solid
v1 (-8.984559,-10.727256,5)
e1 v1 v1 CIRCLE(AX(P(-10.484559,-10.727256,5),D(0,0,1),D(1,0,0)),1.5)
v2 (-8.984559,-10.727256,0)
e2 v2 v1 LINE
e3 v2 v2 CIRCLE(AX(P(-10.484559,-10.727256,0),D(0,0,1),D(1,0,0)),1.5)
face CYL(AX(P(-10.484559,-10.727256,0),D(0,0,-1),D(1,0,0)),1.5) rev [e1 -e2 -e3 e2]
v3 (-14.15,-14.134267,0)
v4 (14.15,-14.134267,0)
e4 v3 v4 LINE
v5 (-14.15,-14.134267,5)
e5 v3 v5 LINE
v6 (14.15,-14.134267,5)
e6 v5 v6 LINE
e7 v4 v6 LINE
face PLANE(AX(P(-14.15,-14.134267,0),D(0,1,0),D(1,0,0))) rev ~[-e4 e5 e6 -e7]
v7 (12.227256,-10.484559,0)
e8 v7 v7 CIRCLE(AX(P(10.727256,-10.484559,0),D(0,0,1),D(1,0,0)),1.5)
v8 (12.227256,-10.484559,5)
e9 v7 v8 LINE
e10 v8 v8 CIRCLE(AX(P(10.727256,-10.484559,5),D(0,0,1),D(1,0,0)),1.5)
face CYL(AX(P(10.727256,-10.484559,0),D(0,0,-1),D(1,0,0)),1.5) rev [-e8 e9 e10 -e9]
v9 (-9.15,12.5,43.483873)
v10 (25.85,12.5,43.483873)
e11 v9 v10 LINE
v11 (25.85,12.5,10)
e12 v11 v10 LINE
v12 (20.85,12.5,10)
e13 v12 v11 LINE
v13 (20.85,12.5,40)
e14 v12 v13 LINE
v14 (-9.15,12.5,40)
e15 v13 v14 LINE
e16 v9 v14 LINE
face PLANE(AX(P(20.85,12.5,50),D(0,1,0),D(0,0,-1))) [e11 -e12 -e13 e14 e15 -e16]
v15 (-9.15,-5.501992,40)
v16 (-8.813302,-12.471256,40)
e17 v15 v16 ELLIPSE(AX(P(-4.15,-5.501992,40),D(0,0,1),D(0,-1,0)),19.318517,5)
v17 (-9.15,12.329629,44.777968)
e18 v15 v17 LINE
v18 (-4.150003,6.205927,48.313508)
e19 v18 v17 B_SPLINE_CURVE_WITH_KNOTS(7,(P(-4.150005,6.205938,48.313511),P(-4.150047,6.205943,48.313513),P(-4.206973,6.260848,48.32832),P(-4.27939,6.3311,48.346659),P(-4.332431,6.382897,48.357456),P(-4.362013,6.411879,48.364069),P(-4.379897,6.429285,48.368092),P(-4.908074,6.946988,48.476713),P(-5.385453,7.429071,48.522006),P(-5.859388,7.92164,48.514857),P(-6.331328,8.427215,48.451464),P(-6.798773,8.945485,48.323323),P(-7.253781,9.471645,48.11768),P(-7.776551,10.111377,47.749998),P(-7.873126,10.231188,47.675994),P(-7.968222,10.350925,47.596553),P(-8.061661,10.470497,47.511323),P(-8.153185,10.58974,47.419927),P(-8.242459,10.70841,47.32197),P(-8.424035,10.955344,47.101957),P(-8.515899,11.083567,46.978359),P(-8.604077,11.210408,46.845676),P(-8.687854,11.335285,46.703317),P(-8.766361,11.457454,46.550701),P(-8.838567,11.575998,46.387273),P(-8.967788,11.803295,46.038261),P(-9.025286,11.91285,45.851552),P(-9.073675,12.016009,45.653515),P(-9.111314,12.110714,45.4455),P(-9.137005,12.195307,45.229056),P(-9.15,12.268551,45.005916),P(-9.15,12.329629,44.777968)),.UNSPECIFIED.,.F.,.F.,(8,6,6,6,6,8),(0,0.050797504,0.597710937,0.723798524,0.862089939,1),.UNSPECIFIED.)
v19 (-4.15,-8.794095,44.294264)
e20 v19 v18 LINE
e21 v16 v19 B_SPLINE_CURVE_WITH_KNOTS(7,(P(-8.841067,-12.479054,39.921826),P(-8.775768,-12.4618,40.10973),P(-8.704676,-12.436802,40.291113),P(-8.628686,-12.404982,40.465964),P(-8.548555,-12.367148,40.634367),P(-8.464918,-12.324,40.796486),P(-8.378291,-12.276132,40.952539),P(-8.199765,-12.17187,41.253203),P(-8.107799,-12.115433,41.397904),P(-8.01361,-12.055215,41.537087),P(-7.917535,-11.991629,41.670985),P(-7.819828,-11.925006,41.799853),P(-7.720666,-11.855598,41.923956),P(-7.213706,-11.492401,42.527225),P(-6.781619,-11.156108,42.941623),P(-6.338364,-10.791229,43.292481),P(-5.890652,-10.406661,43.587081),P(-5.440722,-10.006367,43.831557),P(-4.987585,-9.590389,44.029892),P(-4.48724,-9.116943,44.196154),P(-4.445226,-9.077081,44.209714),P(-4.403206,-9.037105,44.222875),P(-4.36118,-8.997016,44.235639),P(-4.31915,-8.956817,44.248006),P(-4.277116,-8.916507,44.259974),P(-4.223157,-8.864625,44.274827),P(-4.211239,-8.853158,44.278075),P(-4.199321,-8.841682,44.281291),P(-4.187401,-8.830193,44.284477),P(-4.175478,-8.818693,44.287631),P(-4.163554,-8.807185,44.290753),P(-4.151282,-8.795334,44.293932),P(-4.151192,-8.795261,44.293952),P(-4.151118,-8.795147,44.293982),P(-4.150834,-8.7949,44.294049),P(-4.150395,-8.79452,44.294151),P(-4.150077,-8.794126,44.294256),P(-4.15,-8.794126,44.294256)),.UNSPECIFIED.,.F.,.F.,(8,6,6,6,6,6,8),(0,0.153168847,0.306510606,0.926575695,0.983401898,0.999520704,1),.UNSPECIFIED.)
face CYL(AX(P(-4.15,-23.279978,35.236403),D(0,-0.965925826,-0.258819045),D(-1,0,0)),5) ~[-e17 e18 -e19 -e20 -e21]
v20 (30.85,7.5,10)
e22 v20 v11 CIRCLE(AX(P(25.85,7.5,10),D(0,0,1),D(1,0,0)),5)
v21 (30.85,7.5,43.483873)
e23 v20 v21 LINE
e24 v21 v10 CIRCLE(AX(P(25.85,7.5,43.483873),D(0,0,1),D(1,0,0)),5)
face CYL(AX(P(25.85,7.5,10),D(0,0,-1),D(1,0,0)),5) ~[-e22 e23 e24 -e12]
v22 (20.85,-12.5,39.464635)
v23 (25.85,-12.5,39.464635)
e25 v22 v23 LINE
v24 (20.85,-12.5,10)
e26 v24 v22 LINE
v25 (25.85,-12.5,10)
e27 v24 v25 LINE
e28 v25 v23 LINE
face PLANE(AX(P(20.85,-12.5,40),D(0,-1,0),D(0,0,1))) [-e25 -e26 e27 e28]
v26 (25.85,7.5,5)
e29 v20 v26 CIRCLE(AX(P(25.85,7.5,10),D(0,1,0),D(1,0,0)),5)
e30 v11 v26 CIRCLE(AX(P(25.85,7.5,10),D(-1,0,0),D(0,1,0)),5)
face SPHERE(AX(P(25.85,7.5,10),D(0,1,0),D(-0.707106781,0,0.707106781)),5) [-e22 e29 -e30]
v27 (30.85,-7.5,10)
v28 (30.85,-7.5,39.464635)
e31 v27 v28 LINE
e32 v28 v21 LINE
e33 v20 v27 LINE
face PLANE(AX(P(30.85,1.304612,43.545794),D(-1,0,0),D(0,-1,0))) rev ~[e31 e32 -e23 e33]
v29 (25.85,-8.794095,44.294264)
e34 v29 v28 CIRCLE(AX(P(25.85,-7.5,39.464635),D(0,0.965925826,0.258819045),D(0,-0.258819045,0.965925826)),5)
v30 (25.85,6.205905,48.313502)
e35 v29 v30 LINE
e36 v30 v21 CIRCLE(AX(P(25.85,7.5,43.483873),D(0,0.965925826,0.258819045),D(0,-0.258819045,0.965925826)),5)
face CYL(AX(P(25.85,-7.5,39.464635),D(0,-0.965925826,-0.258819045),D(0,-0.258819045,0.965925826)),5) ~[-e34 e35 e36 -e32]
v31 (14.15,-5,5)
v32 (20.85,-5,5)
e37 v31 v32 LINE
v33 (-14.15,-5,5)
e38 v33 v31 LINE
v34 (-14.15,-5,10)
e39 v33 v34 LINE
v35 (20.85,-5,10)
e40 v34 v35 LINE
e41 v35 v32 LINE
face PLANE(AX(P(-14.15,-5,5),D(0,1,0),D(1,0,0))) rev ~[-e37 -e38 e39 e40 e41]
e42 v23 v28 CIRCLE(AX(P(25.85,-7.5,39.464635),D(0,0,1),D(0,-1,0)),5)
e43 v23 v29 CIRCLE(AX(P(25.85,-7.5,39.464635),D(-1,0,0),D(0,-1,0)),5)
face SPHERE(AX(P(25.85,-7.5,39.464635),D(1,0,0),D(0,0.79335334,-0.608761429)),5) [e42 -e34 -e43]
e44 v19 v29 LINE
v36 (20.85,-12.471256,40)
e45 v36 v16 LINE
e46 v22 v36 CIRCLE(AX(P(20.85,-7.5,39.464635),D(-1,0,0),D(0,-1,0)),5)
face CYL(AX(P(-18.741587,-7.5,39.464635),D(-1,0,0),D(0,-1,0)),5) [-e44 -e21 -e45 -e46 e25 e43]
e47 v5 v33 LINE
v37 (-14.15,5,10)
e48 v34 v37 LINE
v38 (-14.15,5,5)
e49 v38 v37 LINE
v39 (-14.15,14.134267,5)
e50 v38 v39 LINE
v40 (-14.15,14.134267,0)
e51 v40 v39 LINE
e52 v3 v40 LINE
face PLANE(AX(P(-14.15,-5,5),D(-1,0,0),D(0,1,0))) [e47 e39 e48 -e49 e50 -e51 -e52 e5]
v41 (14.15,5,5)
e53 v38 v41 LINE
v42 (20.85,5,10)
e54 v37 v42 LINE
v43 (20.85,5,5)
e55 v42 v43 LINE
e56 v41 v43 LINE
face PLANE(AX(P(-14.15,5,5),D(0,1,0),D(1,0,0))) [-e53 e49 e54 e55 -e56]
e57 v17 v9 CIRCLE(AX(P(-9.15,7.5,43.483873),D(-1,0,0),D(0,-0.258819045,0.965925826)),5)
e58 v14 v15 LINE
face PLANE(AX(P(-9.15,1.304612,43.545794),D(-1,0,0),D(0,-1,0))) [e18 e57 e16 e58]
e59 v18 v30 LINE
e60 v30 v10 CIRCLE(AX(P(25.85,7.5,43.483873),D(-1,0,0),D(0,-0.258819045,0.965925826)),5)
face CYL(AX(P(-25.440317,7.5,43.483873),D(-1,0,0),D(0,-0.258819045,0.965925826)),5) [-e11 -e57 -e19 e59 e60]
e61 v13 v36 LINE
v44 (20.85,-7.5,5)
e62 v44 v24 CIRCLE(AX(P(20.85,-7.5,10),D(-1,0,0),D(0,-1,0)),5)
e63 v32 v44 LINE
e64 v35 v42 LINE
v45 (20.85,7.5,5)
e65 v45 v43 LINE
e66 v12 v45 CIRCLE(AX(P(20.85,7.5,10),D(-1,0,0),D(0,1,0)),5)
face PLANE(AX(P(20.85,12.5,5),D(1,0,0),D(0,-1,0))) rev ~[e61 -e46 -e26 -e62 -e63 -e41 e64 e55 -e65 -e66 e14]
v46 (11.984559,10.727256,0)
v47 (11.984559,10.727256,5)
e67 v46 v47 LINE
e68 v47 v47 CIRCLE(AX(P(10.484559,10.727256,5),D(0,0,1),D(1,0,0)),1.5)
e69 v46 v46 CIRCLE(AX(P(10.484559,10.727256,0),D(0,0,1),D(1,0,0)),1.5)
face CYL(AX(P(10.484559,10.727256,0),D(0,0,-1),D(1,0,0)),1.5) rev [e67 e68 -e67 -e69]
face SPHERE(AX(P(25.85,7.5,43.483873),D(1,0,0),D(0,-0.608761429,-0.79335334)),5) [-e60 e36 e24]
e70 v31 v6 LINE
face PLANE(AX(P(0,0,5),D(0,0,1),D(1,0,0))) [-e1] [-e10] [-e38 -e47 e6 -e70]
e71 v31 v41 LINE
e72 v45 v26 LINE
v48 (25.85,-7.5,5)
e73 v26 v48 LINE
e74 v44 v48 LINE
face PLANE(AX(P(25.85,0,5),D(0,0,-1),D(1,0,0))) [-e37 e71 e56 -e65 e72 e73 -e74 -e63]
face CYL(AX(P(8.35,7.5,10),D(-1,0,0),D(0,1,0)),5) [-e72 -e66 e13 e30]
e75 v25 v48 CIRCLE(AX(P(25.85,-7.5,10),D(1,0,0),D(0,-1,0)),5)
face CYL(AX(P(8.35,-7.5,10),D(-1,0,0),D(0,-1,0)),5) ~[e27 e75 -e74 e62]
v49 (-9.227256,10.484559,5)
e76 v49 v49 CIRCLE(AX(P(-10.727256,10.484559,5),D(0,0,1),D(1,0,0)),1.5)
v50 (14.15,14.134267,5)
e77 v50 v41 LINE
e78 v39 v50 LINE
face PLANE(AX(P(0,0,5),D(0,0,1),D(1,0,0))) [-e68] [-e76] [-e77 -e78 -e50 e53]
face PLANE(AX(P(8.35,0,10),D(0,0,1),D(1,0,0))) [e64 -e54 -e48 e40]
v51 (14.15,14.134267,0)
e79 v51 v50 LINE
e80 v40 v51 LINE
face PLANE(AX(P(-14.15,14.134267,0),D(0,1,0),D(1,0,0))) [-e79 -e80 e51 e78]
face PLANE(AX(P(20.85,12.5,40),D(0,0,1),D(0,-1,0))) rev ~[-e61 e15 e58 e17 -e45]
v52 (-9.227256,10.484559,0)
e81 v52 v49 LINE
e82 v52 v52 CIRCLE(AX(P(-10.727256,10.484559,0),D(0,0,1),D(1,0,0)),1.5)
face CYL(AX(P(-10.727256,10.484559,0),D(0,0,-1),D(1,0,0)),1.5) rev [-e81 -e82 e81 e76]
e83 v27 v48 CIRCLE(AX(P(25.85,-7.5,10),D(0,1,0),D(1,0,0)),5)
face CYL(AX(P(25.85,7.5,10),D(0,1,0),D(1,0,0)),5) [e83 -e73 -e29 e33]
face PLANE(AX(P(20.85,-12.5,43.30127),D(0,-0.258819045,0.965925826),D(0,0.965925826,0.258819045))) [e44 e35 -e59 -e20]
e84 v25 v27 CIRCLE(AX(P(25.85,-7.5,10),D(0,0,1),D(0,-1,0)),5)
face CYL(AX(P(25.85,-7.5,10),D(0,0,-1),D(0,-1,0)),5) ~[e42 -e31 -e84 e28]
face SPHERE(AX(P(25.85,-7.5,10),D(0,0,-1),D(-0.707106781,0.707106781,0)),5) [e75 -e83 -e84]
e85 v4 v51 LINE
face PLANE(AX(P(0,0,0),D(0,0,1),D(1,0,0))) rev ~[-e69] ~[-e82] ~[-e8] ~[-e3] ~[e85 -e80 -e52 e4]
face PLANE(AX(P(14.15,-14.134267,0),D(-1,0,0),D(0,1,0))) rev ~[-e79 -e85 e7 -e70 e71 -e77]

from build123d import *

# Parameters (mm, degrees)
F0_W          = 28.3
F0_H          = 28.2685337434
F0_R          = 1.5
F1_DEPTH      = 5
F2_W          = 45
F2_H          = 10
F3_DEPTH      = 5
F4_W          = 10
F4_H          = 25
F5_DEPTH      = 35
F7_DEPTH      = 30
F7_DEPTH_BACK = 10
F8_T1_DEPTH   = 51.2903171605
F8_T3_DEPTH   = 50.8819045103
F8_T5_DEPTH   = 44.5915873497
F8_T7_DEPTH   = 15.5291427062
F8_T9_DEPTH   = 33.4838731358
F8_T11_DEPTH  = 29.4646352493
F8_T13_DEPTH  = 15
F8_T15_DEPTH  = 17.5
F8_T20_DEPTH  = 5
F8_T26_DEPTH  = 5
F8_S31_W      = 5
F8_S31_H      = 5
F8_T32_DEPTH  = 5
F8_S37_W      = 5
F8_S37_H      = 5
F8_T38_DEPTH  = 5


# Not quite as in the source:
# - a fillet or chamfer that OpenCascade refuses, or shapes differently, is made with other operations: its cross-section is extruded or revolved along the edge and cut away or added


with BuildPart() as f1:
    # F0 (on Top) → F1 (new body)
    with BuildSketch(Plane.XY):
        Rectangle(F0_W, F0_H)
        with Locations((-10.4845586502, -10.7272564019)):
            Circle(F0_R, mode=Mode.SUBTRACT)
        with Locations((10.7272564019, -10.4845586502)):
            Circle(F0_R, mode=Mode.SUBTRACT)
        with Locations((-10.7272564019, 10.4845586502)):
            Circle(F0_R, mode=Mode.SUBTRACT)
        with Locations((10.4845586502, 10.7272564019)):
            Circle(F0_R, mode=Mode.SUBTRACT)
    extrude(amount=F1_DEPTH)

    # F2 (on face) → F3 (join)
    with BuildSketch(Plane.XY.offset(5)):
        with Locations((8.35, 0)):
            Rectangle(F2_W, F2_H)
    extrude(amount=F3_DEPTH)

    # F4 (on face) → F5 (join)
    with BuildSketch(Plane(origin=(0, 0, 5), x_dir=(1, 0, 0), z_dir=(0, 0, -1))):
        with Locations((25.85, 0)):
            Rectangle(F4_W, F4_H)
    extrude(amount=-F5_DEPTH)

    # F6 (on face) → F7 (join, two sides)
    with BuildSketch(Plane(origin=(20.85, 0, 0), x_dir=(0, -1, 0), z_dir=(-1, 0, 0))) as f7_sk:
        Polygon((-12.5, 50), (-12.5, 40), (12.5, 40), (12.5, 43.3012701892), align=None)
    extrude(amount=F7_DEPTH)
    extrude(f7_sk.sketch, amount=-F7_DEPTH_BACK)

    # F8: fillet of radius 5 on 9 edges, made by hand

    # F8_s2 → F8_t1 (cut)
    with BuildSketch(Plane.YZ.offset(-25.4403171605)):
        with BuildLine():
            ThreePointArc((6.2059047745, 48.3135022672), (10.543807145, 47.4506398373), (12.5, 43.4838731358))
            Line((12.5, 43.4838731358), (12.5, 50))
            Line((12.5, 50), (6.2059047745, 48.3135022672))
        make_face()
    extrude(amount=F8_T1_DEPTH, mode=Mode.SUBTRACT)

    # F8_s4 → F8_t3 (cut)
    with BuildSketch(Plane(origin=(0, -12.911414055, -3.4596029692), x_dir=(1, 0, 0), z_dir=(0, 0.9659258263, 0.2588190451))):
        with BuildLine():
            ThreePointArc((-9.15, -40.0610532507), (-7.6855339059, -43.5965871566), (-4.15, -45.0610532507))
            Line((-4.15, -45.0610532507), (-9.15, -45.0610532507))
            Line((-9.15, -45.0610532507), (-9.15, -40.0610532507))
        make_face()
    extrude(amount=F8_T3_DEPTH, mode=Mode.SUBTRACT)

    # F8_s6 → F8_t5 (cut)
    with BuildSketch(Plane.YZ.offset(-18.7415873497)):
        with BuildLine():
            ThreePointArc((-12.5, 39.4646352493), (-11.4667667015, 42.5084423944), (-8.7940952255, 44.2942643808))
            Line((-8.7940952255, 44.2942643808), (-12.5, 43.3012701892))
            Line((-12.5, 43.3012701892), (-12.5, 39.4646352493))
        make_face()
    extrude(amount=F8_T5_DEPTH, mode=Mode.SUBTRACT)

    # F8_s8 → F8_t7 (cut)
    with BuildSketch(Plane(origin=(0, 2.8685635481, 0.7686292862), x_dir=(1, 0, 0), z_dir=(0, 0.9659258263, 0.2588190451))):
        with BuildLine():
            ThreePointArc((25.85, -45.0610532507), (29.3855339059, -43.5965871566), (30.85, -40.0610532507))
            Line((30.85, -40.0610532507), (30.85, -45.0610532507))
            Line((30.85, -45.0610532507), (25.85, -45.0610532507))
        make_face()
    extrude(amount=F8_T7_DEPTH, mode=Mode.SUBTRACT)

    # F8_s10 → F8_t9 (cut)
    with BuildSketch(Plane.XY.offset(10)):
        with BuildLine():
            ThreePointArc((30.85, 7.5), (29.3855339059, 11.0355339059), (25.85, 12.5))
            Line((25.85, 12.5), (30.85, 12.5))
            Line((30.85, 12.5), (30.85, 7.5))
        make_face()
    extrude(amount=F8_T9_DEPTH, mode=Mode.SUBTRACT)

    # F8_s12 → F8_t11 (cut)
    with BuildSketch(Plane.XY.offset(10)):
        with BuildLine():
            ThreePointArc((25.85, -12.5), (29.3855339059, -11.0355339059), (30.85, -7.5))
            Line((30.85, -7.5), (30.85, -12.5))
            Line((30.85, -12.5), (25.85, -12.5))
        make_face()
    extrude(amount=F8_T11_DEPTH, mode=Mode.SUBTRACT)

    # F8_s14 → F8_t13 (cut)
    with BuildSketch(Plane.XZ.offset(-7.5)):
        with BuildLine():
            ThreePointArc((30.85, 10), (29.3855339059, 6.4644660941), (25.85, 5))
            Line((25.85, 5), (30.85, 5))
            Line((30.85, 5), (30.85, 10))
        make_face()
    extrude(amount=F8_T13_DEPTH, mode=Mode.SUBTRACT)

    # F8_s16 → F8_t15 (cut)
    with BuildSketch(Plane.YZ.offset(8.35)):
        with BuildLine():
            ThreePointArc((12.5, 10), (11.0355339059, 6.4644660941), (7.5, 5))
            Line((7.5, 5), (12.5, 5))
            Line((12.5, 5), (12.5, 10))
        make_face()
        with BuildLine():
            ThreePointArc((-12.5, 10), (-11.0355339059, 6.4644660941), (-7.5, 5))
            Line((-7.5, 5), (-12.5, 5))
            Line((-12.5, 5), (-12.5, 10))
        make_face()
    extrude(amount=F8_T15_DEPTH, mode=Mode.SUBTRACT)


with BuildPart() as f8_tool18:
    # F8_s19 → F8_t20 (new body)
    with BuildSketch(Plane.YZ.offset(25.85)):
        Polygon((7.5, 43.4838731358), (12.5, 43.4838731358), (12.5, 50), (6.2059047745, 48.3135022672), align=None)
    extrude(amount=F8_T20_DEPTH)

    # F8_s21 → F8_t22 (revolve, cut)
    with BuildSketch(Plane(origin=(25.85, 7.5, 43.4838731358), x_dir=(0, -0.608761429, -0.7933533403), z_dir=(0, -0.7933533403, 0.608761429))):
        with BuildLine():
            ThreePointArc((0, -5), (5, 0), (0, 5))
            Line((0, 5), (0, -5))
        make_face()
    revolve(axis=Axis((25.85, 7.5, 43.4838731358), (1, 0, 0)), mode=Mode.SUBTRACT)


with BuildPart() as f1_1:
    add(f1.part)

    # F8_t17: cut F8_tool18
    add(f8_tool18.part, mode=Mode.SUBTRACT)


with BuildPart() as f8_tool24:
    # F8_s25 → F8_t26 (new body)
    with BuildSketch(Plane.YZ.offset(25.85)):
        Polygon((-7.5, 39.4646352493), (-12.5, 39.4646352493), (-12.5, 43.3012701892), (-8.7940952255, 44.2942643808), align=None)
    extrude(amount=F8_T26_DEPTH)

    # F8_s27 → F8_t28 (revolve, cut)
    with BuildSketch(Plane(origin=(25.85, -7.5, 39.4646352493), x_dir=(0, 0.7933533403, -0.608761429), z_dir=(0, -0.608761429, -0.7933533403))):
        with BuildLine():
            ThreePointArc((0, -5), (5, 0), (0, 5))
            Line((0, 5), (0, -5))
        make_face()
    revolve(axis=Axis((25.85, -7.5, 39.4646352493), (1, 0, 0)), mode=Mode.SUBTRACT)


with BuildPart() as f1_2:
    add(f1_1.part)

    # F8_t23: cut F8_tool24
    add(f8_tool24.part, mode=Mode.SUBTRACT)


with BuildPart() as f8_tool30:
    # F8_s31 → F8_t32 (new body)
    with BuildSketch(Plane.XZ.offset(-7.5)):
        with Locations((28.35, 7.5)):
            Rectangle(F8_S31_W, F8_S31_H)
    extrude(amount=-F8_T32_DEPTH)

    # F8_s33 → F8_t34 (revolve, cut)
    with BuildSketch(Plane(origin=(25.85, 7.5, 10), x_dir=(-0.7071067812, 0, 0.7071067812), z_dir=(-0.7071067812, 0, -0.7071067812))):
        with BuildLine():
            ThreePointArc((0, -5), (5, 0), (0, 5))
            Line((0, 5), (0, -5))
        make_face()
    revolve(axis=Axis((25.85, 7.5, 10), (0, 1, 0)), mode=Mode.SUBTRACT)


with BuildPart() as f1_3:
    add(f1_2.part)

    # F8_t29: cut F8_tool30
    add(f8_tool30.part, mode=Mode.SUBTRACT)


with BuildPart() as f8_tool36:
    # F8_s37 → F8_t38 (new body)
    with BuildSketch(Plane.XY.offset(10)):
        with Locations((28.35, -10)):
            Rectangle(F8_S37_W, F8_S37_H)
    extrude(amount=-F8_T38_DEPTH)

    # F8_s39 → F8_t40 (revolve, cut)
    with BuildSketch(Plane(origin=(25.85, -7.5, 10), x_dir=(-0.7071067812, 0.7071067812, 0), z_dir=(-0.7071067812, -0.7071067812, 0))):
        with BuildLine():
            ThreePointArc((0, -5), (5, 0), (0, 5))
            Line((0, 5), (0, -5))
        make_face()
    revolve(axis=Axis((25.85, -7.5, 10), (0, 0, -1)), mode=Mode.SUBTRACT)


with BuildPart() as f1_4:
    add(f1_3.part)

    # F8_t35: cut F8_tool36
    add(f8_tool36.part, mode=Mode.SUBTRACT)


solid = f1_4.part
